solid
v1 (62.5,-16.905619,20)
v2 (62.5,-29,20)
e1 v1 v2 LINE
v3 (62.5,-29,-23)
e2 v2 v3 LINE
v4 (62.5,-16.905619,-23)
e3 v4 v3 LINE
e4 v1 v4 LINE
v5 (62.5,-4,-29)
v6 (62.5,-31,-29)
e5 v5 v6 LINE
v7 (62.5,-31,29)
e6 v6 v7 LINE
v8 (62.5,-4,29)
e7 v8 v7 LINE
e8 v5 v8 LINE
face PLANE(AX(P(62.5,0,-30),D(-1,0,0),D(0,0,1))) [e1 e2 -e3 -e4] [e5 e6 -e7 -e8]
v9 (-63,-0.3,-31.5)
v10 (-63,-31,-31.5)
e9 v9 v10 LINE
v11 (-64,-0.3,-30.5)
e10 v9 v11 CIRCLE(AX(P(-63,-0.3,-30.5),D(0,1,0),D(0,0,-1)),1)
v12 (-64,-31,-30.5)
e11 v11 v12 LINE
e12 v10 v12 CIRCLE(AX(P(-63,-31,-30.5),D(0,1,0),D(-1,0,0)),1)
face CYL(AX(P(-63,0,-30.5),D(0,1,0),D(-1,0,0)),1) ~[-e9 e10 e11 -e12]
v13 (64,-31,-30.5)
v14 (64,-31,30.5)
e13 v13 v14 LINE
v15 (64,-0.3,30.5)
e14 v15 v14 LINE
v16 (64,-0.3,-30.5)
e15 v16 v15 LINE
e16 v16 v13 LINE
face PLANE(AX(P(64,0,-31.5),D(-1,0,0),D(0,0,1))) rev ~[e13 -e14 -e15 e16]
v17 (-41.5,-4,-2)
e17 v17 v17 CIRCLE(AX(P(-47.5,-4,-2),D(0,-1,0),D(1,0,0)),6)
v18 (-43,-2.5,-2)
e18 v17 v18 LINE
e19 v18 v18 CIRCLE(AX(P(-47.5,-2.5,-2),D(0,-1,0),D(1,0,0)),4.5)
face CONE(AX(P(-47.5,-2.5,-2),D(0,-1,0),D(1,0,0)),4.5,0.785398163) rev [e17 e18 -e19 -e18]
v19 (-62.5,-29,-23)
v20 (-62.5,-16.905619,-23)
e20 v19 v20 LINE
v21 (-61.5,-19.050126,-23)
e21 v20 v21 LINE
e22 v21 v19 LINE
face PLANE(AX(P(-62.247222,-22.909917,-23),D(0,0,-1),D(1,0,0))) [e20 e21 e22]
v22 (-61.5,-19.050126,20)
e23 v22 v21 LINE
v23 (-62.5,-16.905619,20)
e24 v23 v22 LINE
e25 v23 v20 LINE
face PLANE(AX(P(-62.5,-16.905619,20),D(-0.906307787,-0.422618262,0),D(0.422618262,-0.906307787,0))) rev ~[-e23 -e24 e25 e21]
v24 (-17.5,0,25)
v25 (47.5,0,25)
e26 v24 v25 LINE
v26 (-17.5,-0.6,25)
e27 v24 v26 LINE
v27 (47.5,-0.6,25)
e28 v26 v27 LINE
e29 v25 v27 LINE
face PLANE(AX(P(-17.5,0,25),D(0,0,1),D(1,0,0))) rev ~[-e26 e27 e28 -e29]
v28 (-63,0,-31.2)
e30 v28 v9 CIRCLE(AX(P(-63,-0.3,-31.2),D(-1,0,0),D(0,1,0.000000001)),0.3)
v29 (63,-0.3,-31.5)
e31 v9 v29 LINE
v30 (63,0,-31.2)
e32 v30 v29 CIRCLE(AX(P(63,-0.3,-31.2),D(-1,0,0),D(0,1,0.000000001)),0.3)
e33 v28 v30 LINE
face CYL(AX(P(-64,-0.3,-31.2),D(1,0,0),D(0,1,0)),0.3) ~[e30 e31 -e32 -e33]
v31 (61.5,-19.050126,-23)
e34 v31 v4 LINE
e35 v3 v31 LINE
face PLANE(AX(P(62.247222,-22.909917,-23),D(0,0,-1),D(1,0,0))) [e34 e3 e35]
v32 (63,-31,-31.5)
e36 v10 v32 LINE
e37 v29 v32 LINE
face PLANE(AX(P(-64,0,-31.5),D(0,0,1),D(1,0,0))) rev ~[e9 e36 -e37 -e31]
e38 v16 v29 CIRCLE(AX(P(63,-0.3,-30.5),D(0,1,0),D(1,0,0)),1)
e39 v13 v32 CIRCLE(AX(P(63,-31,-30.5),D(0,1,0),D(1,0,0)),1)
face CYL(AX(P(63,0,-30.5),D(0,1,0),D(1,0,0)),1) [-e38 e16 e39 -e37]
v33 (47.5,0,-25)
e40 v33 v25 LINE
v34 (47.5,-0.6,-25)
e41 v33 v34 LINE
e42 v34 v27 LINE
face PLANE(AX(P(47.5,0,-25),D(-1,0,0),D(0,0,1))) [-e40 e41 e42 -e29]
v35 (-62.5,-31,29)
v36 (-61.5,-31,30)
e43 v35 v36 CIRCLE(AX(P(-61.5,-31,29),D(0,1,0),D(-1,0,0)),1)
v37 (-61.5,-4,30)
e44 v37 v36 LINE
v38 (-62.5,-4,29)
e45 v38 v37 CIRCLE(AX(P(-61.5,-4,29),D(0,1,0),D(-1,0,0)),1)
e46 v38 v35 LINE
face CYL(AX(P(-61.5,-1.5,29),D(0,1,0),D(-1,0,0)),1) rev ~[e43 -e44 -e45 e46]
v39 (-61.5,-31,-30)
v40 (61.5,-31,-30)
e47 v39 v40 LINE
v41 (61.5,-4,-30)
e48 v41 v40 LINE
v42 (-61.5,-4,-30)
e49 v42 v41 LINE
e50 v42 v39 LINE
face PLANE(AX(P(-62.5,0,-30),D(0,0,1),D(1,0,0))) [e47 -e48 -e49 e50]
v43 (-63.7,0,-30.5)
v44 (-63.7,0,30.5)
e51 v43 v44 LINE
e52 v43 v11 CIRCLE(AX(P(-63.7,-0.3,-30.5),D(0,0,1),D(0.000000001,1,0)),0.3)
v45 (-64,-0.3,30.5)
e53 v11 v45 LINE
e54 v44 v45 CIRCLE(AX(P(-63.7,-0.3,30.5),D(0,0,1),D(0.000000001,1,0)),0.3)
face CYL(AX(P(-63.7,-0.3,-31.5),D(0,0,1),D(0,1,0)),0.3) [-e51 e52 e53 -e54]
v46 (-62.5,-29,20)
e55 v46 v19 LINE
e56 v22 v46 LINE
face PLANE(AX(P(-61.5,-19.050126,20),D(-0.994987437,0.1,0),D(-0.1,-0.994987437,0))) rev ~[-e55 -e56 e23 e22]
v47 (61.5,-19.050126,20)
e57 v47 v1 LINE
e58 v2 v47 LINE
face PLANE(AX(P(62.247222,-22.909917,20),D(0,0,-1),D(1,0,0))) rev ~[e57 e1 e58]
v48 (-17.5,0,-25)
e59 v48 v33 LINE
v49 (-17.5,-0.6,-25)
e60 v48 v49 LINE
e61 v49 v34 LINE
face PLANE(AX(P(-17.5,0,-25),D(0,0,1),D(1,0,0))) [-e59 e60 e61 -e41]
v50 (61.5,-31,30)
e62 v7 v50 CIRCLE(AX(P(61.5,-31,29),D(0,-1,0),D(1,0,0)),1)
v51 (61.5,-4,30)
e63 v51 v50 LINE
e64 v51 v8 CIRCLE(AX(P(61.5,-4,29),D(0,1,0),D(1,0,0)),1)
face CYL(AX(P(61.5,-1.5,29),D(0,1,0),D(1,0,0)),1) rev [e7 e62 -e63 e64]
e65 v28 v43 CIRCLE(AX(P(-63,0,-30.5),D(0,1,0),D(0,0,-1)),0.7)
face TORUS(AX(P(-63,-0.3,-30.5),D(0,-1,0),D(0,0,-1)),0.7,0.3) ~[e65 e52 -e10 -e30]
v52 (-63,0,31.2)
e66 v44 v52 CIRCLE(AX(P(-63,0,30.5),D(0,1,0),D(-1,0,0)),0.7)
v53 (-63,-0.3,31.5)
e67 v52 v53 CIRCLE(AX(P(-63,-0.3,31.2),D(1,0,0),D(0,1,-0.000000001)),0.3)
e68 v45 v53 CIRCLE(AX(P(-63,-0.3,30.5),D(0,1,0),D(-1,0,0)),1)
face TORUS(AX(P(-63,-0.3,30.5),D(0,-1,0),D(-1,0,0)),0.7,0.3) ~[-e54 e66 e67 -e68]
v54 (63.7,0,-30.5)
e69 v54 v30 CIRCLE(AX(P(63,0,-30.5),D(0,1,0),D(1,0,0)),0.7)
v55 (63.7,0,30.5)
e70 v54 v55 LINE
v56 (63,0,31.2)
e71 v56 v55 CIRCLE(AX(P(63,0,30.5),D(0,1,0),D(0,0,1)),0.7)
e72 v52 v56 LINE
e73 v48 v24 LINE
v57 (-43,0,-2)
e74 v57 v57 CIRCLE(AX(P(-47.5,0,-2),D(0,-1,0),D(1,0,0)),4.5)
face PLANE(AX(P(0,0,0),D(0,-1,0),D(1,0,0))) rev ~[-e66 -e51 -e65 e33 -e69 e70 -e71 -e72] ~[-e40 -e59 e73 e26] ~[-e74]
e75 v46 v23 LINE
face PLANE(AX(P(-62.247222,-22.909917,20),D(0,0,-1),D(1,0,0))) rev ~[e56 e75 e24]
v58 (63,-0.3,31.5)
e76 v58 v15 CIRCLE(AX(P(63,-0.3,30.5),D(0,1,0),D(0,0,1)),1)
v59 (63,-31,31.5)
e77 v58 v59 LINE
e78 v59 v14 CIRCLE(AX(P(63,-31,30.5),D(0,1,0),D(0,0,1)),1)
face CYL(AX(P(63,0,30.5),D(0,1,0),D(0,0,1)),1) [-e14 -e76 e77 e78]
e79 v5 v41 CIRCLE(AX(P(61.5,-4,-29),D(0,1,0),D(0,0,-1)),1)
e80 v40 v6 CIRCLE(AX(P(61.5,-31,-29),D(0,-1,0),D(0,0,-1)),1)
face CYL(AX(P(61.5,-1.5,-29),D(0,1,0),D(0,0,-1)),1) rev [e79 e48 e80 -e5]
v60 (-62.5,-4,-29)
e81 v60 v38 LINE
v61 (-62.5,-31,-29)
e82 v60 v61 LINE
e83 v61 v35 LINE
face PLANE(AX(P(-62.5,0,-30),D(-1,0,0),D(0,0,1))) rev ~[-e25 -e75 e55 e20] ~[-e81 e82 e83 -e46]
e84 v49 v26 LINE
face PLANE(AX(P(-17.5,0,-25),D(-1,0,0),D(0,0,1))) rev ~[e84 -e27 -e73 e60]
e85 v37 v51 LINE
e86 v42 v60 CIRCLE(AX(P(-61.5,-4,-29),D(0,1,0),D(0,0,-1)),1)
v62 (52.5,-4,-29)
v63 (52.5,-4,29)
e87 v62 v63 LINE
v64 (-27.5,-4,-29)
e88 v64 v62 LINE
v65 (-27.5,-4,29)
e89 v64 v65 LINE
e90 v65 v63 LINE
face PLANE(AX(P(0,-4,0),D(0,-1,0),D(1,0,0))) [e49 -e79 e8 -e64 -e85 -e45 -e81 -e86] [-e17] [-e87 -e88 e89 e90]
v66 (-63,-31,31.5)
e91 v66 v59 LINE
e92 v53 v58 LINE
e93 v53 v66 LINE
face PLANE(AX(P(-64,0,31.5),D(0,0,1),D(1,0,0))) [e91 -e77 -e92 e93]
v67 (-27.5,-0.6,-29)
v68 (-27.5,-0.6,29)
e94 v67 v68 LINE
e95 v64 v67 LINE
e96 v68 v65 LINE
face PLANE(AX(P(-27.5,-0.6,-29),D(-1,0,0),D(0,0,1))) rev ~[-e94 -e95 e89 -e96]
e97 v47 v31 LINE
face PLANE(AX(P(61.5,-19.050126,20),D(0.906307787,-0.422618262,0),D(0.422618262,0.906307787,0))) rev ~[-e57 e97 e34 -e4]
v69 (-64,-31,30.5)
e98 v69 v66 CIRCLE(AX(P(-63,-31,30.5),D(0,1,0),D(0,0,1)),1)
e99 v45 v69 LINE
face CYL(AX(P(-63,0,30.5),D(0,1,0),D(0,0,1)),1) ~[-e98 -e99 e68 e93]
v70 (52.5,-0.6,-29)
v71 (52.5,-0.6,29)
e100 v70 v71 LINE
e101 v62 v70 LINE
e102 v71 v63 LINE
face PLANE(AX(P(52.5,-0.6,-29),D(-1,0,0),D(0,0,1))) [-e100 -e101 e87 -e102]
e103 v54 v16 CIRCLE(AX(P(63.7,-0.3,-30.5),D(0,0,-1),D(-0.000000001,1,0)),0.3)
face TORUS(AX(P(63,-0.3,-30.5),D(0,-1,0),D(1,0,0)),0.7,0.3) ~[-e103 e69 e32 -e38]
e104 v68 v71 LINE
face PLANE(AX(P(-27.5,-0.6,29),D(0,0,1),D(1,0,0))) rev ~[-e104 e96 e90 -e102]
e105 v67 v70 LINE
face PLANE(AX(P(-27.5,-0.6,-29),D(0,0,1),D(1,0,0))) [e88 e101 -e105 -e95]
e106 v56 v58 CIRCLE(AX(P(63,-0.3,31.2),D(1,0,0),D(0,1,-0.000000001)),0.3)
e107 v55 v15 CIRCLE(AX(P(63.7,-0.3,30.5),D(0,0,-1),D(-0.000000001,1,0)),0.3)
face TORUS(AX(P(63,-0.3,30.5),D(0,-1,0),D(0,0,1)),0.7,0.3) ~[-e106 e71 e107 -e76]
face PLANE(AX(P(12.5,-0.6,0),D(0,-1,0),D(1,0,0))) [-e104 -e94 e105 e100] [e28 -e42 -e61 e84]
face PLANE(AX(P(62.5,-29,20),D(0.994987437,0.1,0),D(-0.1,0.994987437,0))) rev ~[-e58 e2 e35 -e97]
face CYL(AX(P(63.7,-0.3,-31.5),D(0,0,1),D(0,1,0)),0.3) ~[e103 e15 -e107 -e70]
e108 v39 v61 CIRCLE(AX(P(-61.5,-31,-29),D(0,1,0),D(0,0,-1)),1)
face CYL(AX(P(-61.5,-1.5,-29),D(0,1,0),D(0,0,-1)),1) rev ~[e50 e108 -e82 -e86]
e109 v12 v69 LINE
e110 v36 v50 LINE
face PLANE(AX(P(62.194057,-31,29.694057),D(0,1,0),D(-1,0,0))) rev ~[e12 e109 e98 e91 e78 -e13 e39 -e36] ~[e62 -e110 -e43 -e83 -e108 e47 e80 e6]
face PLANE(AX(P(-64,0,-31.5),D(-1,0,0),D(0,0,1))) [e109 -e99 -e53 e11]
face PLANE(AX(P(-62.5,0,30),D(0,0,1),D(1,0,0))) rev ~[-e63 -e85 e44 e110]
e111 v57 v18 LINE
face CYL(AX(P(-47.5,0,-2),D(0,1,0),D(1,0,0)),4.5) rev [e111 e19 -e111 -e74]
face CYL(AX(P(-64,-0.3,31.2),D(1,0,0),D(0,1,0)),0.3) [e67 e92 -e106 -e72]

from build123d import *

# Parameters (mm, degrees)
F0_W         = 128
F0_H         = 63
F0_W_2       = 125
F0_H_2       = 60
F1_DEPTH     = 31
F0_R         = 4.5
F0_W_3       = 80
F0_H_3       = 58
F0_W_4       = 65
F0_H_4       = 50
F2_DEPTH     = 4
F3_START     = 0.6
F3_DEPTH     = 3.4
F4_R         = 0.3
F6_START     = 10
F6_DEPTH     = 43
F7_W         = 6
F7_H         = 60
F8_DEPTH     = 1
F9_T1_DEPTH  = 29.5
F9_T3_DEPTH  = 33.5
F9_T6_ANGLE  = 90
F9_T8_ANGLE  = 90
F9_T10_ANGLE = 90
F9_T12_ANGLE = 90
F10_SIZE     = 1.5


# Not quite as in the source:
# - a fillet or chamfer that OpenCascade refuses, or shapes differently, is made with other operations: its cross-section is extruded or revolved along the edge and cut away or added


with BuildPart() as f1:
    # F0 (on Front) → F1 (new body)
    with BuildSketch(Plane.XZ):
        Rectangle(F0_W, F0_H)
        Rectangle(F0_W_2, F0_H_2, mode=Mode.SUBTRACT)
    extrude(amount=F1_DEPTH)

    # F0 (on Front) → F2 (join)
    with BuildSketch(Plane.XZ):
        Rectangle(F0_W_2, F0_H_2)
        with Locations((-47.5, -2)):
            Circle(F0_R, mode=Mode.SUBTRACT)
        with Locations((12.5, 0)):
            Rectangle(F0_W_3, F0_H_3, mode=Mode.SUBTRACT)
        with Locations((12.5, 0)):
            Rectangle(F0_W_3, F0_H_3)
        with Locations((15, 0)):
            Rectangle(F0_W_4, F0_H_4, mode=Mode.SUBTRACT)
    extrude(amount=F2_DEPTH)

    # F0 (on Front) → F3 (cut)
    with BuildSketch(Plane.XZ.offset(F3_START)):
        with Locations((12.5, 0)):
            Rectangle(F0_W_3, F0_H_3)
        with Locations((15, 0)):
            Rectangle(F0_W_4, F0_H_4, mode=Mode.SUBTRACT)
    extrude(amount=F3_DEPTH, mode=Mode.SUBTRACT)

    # F4
    f4_edges = [f1.edges().sort_by_distance(p)[0] for p in [
        (64, 0, 0),
        (0, 0, 31.5),
        (-64, 0, 0),
        (0, 0, -31.5),
    ]]
    fillet(f4_edges, radius=F4_R)

    # F5 (on face) → F6 (join)
    with BuildSketch(Plane(origin=(0, 0, 30), x_dir=(1, 0, 0), z_dir=(0, 0, -1)).offset(F6_START)):
        Polygon((-61.5, 19.0501256289), (-62.5, 29), (-62.5, 16.9056187084), align=None)
        Polygon((62.5, 16.9056187084), (62.5, 29), (61.5, 19.0501256289), align=None)
    extrude(amount=F6_DEPTH)

    # F7 (on face) → F8 (join)
    with BuildSketch(Plane.XZ):
        with Locations((-30.5, 0)):
            Rectangle(F7_W, F7_H)
        with Locations((55.5, 0)):
            Rectangle(F7_W, F7_H)
    extrude(amount=F8_DEPTH)

    # F9: fillet of radius 1 on 8 edges, made by hand

    # F9_s2 → F9_t1 (join)
    with BuildSketch(Plane.XZ.offset(1.5)):
        with BuildLine():
            ThreePointArc((62.5, 29), (62.2071067812, 29.7071067812), (61.5, 30))
            Line((61.5, 30), (62.5, 30))
            Line((62.5, 30), (62.5, 29))
        make_face()
        with BuildLine():
            ThreePointArc((-62.5, 29), (-62.2071067812, 29.7071067812), (-61.5, 30))
            Line((-61.5, 30), (-62.5, 30))
            Line((-62.5, 30), (-62.5, 29))
        make_face()
        with BuildLine():
            ThreePointArc((-61.5, -30), (-62.2071067812, -29.7071067812), (-62.5, -29))
            Line((-62.5, -29), (-62.5, -30))
            Line((-62.5, -30), (-61.5, -30))
        make_face()
        with BuildLine():
            ThreePointArc((61.5, -30), (62.2071067812, -29.7071067812), (62.5, -29))
            Line((62.5, -29), (62.5, -30))
            Line((62.5, -30), (61.5, -30))
        make_face()
    extrude(amount=F9_T1_DEPTH)

    # F9_s4 → F9_t3 (cut)
    with BuildSketch(Plane.XZ):
        with BuildLine():
            ThreePointArc((63, 31.5), (63.7071067812, 31.2071067812), (64, 30.5))
            Line((64, 30.5), (64, 31.5))
            Line((64, 31.5), (63, 31.5))
        make_face()
        with BuildLine():
            ThreePointArc((64, -30.5), (63.7071067812, -31.2071067812), (63, -31.5))
            Line((63, -31.5), (64, -31.5))
            Line((64, -31.5), (64, -30.5))
        make_face()
        with BuildLine():
            ThreePointArc((-63, 31.5), (-63.7071067812, 31.2071067812), (-64, 30.5))
            Line((-64, 30.5), (-64, 31.5))
            Line((-64, 31.5), (-63, 31.5))
        make_face()
        with BuildLine():
            ThreePointArc((-64, -30.5), (-63.7071067812, -31.2071067812), (-63, -31.5))
            Line((-63, -31.5), (-64, -31.5))
            Line((-64, -31.5), (-64, -30.5))
        make_face()
    extrude(amount=F9_T3_DEPTH, mode=Mode.SUBTRACT)

    # F9_s5 → F9_t6 (revolve, cut)
    with BuildSketch(Plane.YZ.offset(-63)):
        with BuildLine():
            ThreePointArc((0, -31.2), (-0.0878679656, -31.4121320344), (-0.3, -31.5))
            Line((-0.3, -31.5), (0, -31.5))
            Line((0, -31.5), (0, -31.2))
        make_face()
    revolve(axis=Axis((-63, 0, -30.5), (0, 1, 0)), revolution_arc=F9_T6_ANGLE, mode=Mode.SUBTRACT)

    # F9_s7 → F9_t8 (revolve, cut)
    with BuildSketch(Plane.XY.offset(30.5)):
        with BuildLine():
            ThreePointArc((-63.7, 0), (-63.9121320344, -0.0878679656), (-64, -0.3))
            Line((-64, -0.3), (-64, 0))
            Line((-64, 0), (-63.7, 0))
        make_face()
    revolve(axis=Axis((-63, 0, 30.5), (0, 1, 0)), revolution_arc=F9_T8_ANGLE, mode=Mode.SUBTRACT)

    # F9_s9 → F9_t10 (revolve, cut)
    with BuildSketch(Plane.XY.offset(-30.5)):
        with BuildLine():
            ThreePointArc((63.7, 0), (63.9121320344, -0.0878679656), (64, -0.3))
            Line((64, -0.3), (64, 0))
            Line((64, 0), (63.7, 0))
        make_face()
    revolve(axis=Axis((63, 0, -30.5), (0, 1, 0)), revolution_arc=F9_T10_ANGLE, mode=Mode.SUBTRACT)

    # F9_s11 → F9_t12 (revolve, cut)
    with BuildSketch(Plane.YZ.offset(63)):
        with BuildLine():
            ThreePointArc((0, 31.2), (-0.0878679656, 31.4121320344), (-0.3, 31.5))
            Line((-0.3, 31.5), (0, 31.5))
            Line((0, 31.5), (0, 31.2))
        make_face()
    revolve(axis=Axis((63, 0, 30.5), (0, 1, 0)), revolution_arc=F9_T12_ANGLE, mode=Mode.SUBTRACT)

    # F10
    f10_edges = [f1.edges().sort_by_distance(p)[0] for p in [
        (-52, -4, -2),
    ]]
    chamfer(f10_edges, length=F10_SIZE)


solid = f1.part
